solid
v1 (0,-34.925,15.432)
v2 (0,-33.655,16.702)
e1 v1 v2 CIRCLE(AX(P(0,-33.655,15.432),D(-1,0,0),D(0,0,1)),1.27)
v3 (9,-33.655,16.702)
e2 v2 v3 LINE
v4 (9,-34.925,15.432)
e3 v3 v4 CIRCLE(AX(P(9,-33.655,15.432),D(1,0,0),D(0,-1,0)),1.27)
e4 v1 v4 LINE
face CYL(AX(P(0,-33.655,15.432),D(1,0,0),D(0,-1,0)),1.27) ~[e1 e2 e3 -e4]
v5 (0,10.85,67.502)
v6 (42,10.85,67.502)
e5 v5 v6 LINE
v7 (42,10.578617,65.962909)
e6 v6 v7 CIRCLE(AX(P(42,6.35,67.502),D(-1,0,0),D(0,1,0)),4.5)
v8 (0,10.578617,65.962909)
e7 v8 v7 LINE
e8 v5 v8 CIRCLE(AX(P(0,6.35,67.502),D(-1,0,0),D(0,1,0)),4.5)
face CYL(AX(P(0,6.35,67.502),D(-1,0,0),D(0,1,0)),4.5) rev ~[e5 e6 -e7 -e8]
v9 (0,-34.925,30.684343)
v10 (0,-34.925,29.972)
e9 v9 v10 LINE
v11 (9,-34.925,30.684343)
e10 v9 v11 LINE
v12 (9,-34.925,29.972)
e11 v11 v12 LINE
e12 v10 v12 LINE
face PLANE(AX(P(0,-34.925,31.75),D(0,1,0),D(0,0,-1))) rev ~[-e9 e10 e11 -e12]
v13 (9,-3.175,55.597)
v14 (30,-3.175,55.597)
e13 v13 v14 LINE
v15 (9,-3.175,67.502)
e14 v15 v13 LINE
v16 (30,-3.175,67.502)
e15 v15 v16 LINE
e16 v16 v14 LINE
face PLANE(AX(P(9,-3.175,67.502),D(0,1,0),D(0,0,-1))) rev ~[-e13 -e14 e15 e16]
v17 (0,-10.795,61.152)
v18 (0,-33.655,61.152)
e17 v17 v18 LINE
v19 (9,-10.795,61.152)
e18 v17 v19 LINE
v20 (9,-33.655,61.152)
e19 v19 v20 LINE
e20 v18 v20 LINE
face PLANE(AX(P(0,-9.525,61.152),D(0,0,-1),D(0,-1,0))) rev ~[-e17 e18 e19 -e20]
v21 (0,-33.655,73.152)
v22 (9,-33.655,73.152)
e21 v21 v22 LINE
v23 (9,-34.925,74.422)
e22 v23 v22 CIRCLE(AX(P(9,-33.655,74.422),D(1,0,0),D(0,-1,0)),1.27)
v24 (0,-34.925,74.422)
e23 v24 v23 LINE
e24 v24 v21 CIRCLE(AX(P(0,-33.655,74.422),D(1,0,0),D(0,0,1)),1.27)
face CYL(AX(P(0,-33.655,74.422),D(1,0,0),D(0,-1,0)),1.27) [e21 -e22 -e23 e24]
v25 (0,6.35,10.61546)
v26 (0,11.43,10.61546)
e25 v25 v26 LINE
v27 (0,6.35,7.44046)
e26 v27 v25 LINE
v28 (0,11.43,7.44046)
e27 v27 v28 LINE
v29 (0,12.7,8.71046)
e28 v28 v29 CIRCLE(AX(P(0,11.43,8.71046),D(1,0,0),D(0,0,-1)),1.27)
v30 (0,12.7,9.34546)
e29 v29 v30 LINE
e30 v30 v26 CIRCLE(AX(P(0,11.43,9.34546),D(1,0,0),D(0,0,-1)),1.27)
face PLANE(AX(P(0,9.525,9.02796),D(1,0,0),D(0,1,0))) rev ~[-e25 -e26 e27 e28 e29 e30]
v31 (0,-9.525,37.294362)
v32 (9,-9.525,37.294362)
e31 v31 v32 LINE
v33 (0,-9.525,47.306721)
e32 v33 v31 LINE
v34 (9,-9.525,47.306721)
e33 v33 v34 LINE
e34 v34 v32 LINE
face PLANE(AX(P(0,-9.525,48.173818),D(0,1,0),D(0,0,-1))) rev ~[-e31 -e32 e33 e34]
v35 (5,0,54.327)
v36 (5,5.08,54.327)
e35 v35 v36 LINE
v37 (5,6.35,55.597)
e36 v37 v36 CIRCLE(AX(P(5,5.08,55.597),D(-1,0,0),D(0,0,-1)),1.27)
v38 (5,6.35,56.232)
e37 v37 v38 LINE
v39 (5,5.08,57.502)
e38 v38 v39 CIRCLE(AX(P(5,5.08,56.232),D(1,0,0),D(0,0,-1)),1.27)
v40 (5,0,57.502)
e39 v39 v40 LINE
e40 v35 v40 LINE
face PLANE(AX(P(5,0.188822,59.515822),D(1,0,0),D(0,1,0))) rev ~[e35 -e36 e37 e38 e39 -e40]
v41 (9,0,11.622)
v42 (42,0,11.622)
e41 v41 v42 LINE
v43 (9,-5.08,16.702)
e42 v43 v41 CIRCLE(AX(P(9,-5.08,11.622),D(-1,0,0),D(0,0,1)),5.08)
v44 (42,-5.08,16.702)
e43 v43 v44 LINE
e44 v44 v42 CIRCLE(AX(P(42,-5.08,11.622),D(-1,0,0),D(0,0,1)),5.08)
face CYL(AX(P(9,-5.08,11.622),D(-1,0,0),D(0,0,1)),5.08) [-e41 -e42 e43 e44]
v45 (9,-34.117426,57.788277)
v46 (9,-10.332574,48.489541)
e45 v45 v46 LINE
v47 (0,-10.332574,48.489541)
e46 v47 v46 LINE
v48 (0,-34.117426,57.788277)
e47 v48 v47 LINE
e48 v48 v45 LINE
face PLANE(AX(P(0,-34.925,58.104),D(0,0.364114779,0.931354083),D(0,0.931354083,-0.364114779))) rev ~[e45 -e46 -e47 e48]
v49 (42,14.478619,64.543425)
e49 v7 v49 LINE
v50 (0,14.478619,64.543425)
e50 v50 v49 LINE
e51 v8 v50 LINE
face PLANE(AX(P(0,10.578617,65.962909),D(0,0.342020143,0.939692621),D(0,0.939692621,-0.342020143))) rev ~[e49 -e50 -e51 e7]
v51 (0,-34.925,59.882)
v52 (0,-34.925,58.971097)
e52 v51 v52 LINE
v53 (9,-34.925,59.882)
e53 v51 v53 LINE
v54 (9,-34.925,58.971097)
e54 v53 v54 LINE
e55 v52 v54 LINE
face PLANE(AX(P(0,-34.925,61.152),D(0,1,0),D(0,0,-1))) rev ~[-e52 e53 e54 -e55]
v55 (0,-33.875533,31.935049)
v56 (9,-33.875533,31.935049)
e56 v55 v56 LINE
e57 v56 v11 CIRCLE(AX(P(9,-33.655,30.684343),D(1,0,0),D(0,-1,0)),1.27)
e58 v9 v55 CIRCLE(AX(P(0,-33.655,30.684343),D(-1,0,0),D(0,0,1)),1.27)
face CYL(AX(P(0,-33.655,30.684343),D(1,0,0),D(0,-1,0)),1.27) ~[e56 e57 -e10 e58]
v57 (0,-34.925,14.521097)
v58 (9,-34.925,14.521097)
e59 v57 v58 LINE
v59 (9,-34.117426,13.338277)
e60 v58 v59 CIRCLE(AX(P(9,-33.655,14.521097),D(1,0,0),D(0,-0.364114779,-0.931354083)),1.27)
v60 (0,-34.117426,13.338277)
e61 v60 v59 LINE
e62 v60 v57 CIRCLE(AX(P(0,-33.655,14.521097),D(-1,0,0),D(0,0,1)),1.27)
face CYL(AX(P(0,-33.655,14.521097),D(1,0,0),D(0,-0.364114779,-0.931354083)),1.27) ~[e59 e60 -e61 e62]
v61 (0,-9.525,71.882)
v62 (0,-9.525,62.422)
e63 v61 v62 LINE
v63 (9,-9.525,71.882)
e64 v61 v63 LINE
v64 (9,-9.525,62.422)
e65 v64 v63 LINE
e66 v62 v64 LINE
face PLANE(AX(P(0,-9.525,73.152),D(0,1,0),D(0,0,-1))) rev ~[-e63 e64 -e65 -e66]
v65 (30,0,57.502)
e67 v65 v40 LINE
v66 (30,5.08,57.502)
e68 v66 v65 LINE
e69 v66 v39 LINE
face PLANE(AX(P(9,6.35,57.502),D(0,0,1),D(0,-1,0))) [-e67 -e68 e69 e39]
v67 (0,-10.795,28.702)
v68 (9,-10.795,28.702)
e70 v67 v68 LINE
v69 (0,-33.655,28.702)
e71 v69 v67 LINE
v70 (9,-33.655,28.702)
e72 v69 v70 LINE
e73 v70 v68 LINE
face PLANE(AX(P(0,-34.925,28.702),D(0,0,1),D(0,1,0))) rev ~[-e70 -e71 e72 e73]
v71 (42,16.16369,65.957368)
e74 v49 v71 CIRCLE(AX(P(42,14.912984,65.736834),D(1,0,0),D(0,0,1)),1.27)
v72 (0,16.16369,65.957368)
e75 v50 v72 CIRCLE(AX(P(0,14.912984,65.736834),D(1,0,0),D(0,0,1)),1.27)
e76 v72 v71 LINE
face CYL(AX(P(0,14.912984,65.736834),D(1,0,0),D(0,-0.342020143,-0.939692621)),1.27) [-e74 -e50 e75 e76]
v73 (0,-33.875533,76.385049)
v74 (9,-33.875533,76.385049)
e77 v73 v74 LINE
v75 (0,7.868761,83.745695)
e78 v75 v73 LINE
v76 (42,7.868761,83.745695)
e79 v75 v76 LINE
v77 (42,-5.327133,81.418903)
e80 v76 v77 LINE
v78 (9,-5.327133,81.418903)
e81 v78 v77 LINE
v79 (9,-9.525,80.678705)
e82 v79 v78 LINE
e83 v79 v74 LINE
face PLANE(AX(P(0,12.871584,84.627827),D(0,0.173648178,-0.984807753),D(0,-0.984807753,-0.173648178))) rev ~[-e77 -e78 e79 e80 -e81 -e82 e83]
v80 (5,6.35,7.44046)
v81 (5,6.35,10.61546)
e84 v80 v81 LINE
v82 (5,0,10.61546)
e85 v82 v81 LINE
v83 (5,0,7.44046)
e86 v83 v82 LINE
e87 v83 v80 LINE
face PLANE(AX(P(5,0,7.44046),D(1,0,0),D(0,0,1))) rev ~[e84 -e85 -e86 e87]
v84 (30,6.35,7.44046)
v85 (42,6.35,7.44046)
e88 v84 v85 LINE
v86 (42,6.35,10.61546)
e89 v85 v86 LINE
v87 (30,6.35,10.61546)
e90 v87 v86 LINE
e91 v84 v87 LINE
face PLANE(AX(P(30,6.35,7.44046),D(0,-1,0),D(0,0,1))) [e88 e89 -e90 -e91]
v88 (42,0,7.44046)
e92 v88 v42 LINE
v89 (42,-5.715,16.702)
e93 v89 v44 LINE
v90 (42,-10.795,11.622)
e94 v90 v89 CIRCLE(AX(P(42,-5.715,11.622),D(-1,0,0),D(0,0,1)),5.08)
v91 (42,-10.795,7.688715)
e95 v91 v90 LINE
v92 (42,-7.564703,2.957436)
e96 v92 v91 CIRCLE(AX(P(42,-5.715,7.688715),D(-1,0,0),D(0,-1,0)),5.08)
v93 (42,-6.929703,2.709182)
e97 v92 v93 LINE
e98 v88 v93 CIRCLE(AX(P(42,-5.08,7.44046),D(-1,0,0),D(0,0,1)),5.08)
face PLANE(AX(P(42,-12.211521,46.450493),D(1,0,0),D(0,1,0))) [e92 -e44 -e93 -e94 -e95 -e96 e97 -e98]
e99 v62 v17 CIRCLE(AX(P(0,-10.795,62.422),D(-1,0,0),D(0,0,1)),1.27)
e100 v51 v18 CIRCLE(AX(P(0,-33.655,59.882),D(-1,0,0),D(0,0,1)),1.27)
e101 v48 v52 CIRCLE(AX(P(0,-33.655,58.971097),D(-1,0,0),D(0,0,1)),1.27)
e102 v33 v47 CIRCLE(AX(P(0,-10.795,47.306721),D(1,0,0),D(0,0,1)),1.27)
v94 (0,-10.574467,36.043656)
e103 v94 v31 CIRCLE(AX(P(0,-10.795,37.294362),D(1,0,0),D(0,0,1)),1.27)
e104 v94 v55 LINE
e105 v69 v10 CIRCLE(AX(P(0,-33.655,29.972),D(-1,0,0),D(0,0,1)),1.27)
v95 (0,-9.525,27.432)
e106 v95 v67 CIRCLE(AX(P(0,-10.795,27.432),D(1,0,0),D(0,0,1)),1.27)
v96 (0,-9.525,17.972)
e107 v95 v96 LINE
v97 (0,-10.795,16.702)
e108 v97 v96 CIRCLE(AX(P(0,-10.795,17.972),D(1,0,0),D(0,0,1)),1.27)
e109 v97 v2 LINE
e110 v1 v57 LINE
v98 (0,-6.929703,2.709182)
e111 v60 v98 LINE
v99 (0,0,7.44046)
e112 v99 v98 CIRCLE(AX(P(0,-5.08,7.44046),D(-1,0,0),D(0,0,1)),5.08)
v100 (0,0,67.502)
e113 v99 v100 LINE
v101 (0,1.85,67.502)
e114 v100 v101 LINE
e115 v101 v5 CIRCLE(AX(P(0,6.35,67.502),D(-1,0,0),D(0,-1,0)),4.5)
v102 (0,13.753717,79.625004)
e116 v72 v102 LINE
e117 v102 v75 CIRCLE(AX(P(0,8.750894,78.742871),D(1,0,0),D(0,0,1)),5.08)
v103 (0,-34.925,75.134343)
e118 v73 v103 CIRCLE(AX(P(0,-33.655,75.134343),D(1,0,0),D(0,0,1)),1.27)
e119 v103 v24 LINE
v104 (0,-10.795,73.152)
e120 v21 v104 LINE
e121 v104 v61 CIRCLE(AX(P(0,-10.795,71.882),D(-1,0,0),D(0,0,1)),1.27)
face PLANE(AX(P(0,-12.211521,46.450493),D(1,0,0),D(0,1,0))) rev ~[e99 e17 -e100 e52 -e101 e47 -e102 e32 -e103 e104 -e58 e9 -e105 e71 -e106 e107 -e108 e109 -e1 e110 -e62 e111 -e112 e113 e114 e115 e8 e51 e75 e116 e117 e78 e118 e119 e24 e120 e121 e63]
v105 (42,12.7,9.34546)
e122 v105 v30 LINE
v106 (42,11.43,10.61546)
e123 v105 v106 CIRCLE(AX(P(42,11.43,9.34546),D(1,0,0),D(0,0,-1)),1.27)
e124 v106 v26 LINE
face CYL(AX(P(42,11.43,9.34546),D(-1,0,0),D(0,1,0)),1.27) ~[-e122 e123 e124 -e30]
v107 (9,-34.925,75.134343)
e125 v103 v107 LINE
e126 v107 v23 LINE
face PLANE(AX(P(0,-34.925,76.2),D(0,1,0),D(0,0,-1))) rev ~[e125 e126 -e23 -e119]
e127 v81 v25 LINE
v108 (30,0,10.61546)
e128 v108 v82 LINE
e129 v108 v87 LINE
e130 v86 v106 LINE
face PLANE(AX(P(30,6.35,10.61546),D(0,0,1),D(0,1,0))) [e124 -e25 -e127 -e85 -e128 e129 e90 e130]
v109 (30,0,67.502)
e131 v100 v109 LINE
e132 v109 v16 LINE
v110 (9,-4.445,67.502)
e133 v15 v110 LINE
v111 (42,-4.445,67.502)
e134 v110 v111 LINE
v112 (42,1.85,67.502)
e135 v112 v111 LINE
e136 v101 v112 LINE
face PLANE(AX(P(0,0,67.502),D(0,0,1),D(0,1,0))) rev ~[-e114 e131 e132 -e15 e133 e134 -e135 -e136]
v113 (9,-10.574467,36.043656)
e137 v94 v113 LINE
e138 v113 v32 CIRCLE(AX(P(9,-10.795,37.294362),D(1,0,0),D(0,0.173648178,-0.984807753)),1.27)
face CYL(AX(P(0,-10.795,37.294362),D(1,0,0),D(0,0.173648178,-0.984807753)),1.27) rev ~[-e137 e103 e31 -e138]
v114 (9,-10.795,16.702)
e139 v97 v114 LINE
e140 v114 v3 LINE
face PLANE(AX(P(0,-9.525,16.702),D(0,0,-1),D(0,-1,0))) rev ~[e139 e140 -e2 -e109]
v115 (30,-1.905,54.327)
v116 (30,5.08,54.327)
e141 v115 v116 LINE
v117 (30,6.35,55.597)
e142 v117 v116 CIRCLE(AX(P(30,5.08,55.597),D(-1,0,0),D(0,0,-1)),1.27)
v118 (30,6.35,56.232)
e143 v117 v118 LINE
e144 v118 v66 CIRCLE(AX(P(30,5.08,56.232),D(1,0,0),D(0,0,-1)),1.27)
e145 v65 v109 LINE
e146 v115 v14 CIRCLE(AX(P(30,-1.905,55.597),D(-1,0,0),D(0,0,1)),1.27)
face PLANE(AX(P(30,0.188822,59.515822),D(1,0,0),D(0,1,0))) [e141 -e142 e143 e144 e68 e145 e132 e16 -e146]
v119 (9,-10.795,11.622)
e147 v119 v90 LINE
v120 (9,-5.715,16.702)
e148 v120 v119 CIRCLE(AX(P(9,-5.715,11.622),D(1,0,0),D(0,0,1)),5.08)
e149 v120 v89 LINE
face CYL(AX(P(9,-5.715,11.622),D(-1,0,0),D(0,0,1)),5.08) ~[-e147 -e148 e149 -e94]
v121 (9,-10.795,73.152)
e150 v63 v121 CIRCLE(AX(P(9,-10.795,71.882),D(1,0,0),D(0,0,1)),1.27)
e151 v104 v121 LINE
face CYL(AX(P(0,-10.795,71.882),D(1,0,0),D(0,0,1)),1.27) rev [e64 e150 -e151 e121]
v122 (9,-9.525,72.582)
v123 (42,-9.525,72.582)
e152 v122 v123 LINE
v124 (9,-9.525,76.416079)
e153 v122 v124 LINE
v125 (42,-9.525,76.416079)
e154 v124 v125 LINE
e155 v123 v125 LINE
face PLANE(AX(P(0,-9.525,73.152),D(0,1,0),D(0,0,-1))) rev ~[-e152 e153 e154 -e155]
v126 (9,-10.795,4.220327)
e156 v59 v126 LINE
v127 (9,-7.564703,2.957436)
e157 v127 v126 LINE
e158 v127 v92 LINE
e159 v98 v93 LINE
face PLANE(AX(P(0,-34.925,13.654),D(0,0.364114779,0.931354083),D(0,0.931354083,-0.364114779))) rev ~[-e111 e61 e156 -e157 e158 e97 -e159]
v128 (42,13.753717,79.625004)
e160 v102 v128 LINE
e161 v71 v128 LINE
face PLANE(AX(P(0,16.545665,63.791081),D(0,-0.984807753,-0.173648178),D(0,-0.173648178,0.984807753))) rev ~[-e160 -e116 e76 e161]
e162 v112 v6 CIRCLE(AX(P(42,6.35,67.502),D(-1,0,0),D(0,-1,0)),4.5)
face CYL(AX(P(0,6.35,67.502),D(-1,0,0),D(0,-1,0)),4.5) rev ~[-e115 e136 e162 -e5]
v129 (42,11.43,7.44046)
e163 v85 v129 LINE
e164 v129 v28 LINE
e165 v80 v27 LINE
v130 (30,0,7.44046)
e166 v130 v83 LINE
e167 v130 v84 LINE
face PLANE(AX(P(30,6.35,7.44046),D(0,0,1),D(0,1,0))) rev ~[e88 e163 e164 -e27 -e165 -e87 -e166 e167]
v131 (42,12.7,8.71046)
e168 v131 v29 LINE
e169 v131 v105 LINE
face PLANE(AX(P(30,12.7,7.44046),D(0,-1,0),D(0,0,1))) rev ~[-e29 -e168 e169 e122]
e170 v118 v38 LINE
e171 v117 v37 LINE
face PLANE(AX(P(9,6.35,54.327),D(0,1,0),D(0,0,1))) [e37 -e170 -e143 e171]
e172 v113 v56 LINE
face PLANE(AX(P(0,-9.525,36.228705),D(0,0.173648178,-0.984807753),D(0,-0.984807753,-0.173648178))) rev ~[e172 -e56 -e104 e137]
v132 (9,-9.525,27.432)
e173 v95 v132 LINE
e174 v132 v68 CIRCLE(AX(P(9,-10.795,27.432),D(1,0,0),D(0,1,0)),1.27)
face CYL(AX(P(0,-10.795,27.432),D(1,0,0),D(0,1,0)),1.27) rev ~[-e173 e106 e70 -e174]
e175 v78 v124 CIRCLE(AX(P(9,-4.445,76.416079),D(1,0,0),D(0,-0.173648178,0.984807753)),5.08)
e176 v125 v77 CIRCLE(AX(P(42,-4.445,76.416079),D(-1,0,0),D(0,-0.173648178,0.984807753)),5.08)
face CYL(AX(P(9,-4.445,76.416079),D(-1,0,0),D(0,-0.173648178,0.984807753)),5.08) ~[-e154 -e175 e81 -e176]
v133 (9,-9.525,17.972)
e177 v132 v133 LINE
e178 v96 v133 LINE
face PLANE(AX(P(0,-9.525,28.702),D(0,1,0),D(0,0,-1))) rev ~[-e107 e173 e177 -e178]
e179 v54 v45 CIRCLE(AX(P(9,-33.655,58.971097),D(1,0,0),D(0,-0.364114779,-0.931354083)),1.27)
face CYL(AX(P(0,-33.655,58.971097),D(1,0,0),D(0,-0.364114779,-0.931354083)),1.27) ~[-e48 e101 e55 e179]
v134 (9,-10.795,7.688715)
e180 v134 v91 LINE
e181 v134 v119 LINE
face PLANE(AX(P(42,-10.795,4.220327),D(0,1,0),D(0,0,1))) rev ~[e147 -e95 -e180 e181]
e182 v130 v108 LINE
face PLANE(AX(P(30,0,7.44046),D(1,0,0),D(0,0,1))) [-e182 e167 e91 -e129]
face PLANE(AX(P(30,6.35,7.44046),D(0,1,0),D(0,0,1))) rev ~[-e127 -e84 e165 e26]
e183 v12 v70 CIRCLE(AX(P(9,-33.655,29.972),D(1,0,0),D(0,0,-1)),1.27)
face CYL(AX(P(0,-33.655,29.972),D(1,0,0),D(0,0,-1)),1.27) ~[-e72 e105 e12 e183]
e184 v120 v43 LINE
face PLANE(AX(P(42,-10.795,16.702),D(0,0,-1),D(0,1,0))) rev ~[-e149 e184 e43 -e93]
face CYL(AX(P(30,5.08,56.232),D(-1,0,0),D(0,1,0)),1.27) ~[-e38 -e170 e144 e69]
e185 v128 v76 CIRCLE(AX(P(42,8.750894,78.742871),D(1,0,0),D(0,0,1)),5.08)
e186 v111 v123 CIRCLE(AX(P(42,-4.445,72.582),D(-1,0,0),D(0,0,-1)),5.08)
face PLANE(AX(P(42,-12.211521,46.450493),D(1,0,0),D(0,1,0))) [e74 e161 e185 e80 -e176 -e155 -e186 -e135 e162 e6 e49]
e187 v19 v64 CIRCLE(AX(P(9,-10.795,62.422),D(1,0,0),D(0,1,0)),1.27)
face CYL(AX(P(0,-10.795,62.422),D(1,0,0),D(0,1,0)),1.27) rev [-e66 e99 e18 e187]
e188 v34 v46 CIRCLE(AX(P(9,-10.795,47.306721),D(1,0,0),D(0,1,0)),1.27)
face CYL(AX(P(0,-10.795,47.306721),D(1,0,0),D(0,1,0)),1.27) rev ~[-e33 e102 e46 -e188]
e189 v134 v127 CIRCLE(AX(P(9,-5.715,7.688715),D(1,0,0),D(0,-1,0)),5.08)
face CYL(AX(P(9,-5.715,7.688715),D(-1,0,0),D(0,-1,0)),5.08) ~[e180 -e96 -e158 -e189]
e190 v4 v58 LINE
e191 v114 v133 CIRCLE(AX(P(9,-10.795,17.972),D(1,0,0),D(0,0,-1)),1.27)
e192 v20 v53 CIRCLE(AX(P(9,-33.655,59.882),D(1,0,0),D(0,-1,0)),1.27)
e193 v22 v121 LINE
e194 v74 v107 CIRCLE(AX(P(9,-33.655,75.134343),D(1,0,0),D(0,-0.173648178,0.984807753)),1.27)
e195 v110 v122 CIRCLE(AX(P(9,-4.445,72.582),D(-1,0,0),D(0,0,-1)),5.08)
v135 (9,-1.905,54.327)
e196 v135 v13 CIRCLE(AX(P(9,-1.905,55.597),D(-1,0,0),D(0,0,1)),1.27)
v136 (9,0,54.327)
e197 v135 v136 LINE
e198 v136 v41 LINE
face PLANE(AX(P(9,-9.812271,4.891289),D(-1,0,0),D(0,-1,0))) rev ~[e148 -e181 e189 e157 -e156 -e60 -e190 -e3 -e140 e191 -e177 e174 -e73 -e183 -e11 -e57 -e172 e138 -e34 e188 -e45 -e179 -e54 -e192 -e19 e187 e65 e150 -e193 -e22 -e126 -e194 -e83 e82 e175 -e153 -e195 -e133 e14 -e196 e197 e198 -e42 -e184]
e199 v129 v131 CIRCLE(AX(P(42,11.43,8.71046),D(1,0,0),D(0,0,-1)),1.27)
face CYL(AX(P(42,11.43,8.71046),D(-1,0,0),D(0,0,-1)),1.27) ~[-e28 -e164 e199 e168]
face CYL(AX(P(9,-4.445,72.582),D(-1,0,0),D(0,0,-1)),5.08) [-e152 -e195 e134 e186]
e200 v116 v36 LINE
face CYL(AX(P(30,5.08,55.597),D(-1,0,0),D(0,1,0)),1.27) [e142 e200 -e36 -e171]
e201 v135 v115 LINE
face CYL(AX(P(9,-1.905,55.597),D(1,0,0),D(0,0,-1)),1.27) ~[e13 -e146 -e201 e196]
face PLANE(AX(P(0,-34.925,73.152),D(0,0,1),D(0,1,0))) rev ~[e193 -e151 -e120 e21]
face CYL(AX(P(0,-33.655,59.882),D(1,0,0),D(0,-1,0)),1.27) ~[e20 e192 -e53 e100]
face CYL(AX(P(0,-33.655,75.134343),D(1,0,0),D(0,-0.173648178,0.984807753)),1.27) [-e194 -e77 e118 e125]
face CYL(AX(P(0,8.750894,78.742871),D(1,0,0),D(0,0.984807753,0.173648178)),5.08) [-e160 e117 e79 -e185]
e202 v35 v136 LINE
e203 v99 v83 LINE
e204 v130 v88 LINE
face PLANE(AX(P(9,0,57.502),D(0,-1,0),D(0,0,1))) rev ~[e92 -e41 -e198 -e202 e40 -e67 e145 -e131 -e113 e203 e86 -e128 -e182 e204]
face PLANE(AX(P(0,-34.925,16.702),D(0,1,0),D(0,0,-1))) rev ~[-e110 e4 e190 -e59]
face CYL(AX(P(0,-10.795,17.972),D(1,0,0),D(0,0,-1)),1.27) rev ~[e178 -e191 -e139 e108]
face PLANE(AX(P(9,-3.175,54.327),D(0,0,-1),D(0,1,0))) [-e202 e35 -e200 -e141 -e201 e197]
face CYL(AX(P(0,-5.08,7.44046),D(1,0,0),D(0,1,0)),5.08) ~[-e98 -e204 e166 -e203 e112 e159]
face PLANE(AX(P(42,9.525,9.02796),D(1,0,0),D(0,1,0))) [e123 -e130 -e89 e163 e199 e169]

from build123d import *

# Parameters (mm, degrees)
F1_DEPTH       = 42
F2_R           = 5.08
F3_R           = 1.27
F4_W           = 25
F4_H           = 3.175
F5_DEPTH       = 12.7
F7_DEPTH       = 33
F8_T1_DEPTH    = 45.7
F8_T3_DEPTH    = 43.656565316
F8_T5_DEPTH    = 41.6709689227
F9_W           = 6.35
F9_H           = 3.175
F10_DEPTH      = 12
F10_DEPTH_BACK = 30
F12_DEPTH      = 21
F12_DEPTH_BACK = 4
F13_R          = 1.27


# Not quite as in the source:
# - a fillet or chamfer that OpenCascade refuses, or shapes differently, is made with other operations: its cross-section is extruded or revolved along the edge and cut away or added


with BuildPart() as f1:
    # F0 (on Right) → F1 (new body)
    with BuildSketch(Plane.YZ):
        with BuildLine():
            Line((0, 0), (0, 67.502))
            Line((0, 67.502), (1.85, 67.502))
            ThreePointArc((1.85, 67.502), (6.35, 72.002), (10.85, 67.502))
            ThreePointArc((10.85, 67.502), (10.7816348886, 66.7205832005), (10.5786167935, 65.962909355))
            Line((10.5786167935, 65.962909355), (16.5456649355, 63.7910814449))
            Line((16.5456649355, 63.7910814449), (12.8715844298, 84.6278274207))
            Line((12.8715844298, 84.6278274207), (-34.925, 76.2))
            Line((-34.925, 76.2), (-34.925, 73.152))
            Line((-34.925, 73.152), (-9.525, 73.152))
            Line((-9.525, 73.152), (-9.525, 61.152))
            Line((-9.525, 61.152), (-34.925, 61.152))
            Line((-34.925, 61.152), (-34.925, 58.104))
            Line((-34.925, 58.104), (-9.525, 48.1738181818))
            Line((-9.525, 48.1738181818), (-9.525, 36.22870531))
            Line((-9.525, 36.22870531), (-34.925, 31.75))
            Line((-34.925, 31.75), (-34.925, 28.702))
            Line((-34.925, 28.702), (-9.525, 28.702))
            Line((-9.525, 28.702), (-9.525, 16.702))
            Line((-9.525, 16.702), (-34.925, 16.702))
            Line((-34.925, 16.702), (-34.925, 13.654))
            Line((-34.925, 13.654), (0, 0))
        make_face()
    extrude(amount=F1_DEPTH)

    # F2
    f2_edges = [f1.edges().sort_by_distance(p)[0] for p in [
        (21, 12.871584, 84.627827),
        (21, 0, 0),
    ]]
    fillet(f2_edges, radius=F2_R)

    # F3
    f3_edges = [f1.edges().sort_by_distance(p)[0] for p in [
        (21, 16.545665, 63.791081),
        (21, -9.525, 28.702),
        (21, -9.525, 48.173818),
        (21, -9.525, 73.152),
        (21, -9.525, 61.152),
        (21, -9.525, 16.702),
        (21, -34.925, 16.702),
        (21, -34.925, 13.654),
        (21, -34.925, 28.702),
        (21, -34.925, 61.152),
        (21, -34.925, 58.104),
        (21, -34.925, 31.75),
        (21, -34.925, 73.152),
        (21, -34.925, 76.2),
        (21, -9.525, 36.228705),
    ]]
    fillet(f3_edges, radius=F3_R)

    # F4 (on face) → F5 (join)
    with BuildSketch(Plane(origin=(0, 0, 0), x_dir=(-1, 0, 0), z_dir=(0, 1, 0))):
        with Locations((-17.5, 9.0279602963)):
            Rectangle(F4_W, F4_H)
    extrude(amount=F5_DEPTH)

    # F6 (on face) → F7 (cut)
    with BuildSketch(Plane.YZ.offset(42)):
        Polygon((0, 16.702), (0, 67.502), (-9.525, 67.502), (-9.525, 80.67870531), (-34.925, 80.67870531), (-34.925, 4.2203272727), (-10.795, 4.2203272727), (-10.795, 16.702), align=None)
    extrude(amount=-F7_DEPTH, mode=Mode.SUBTRACT)

    # F8: fillet of radius 5.08 on 5 edges, made by hand

    # F8_s2 → F8_t1 (cut)
    with BuildSketch(Plane.YZ.offset(9)):
        with BuildLine():
            ThreePointArc((-4.445, 67.502), (-8.0371024484, 68.9898975516), (-9.525, 72.582))
            Line((-9.525, 72.582), (-9.525, 67.502))
            Line((-9.525, 67.502), (-4.445, 67.502))
        make_face()
        with BuildLine():
            ThreePointArc((-5.715, 16.702), (-9.3071024484, 15.2141024484), (-10.795, 11.622))
            Line((-10.795, 11.622), (-10.795, 16.702))
            Line((-10.795, 16.702), (-5.715, 16.702))
        make_face()
        with BuildLine():
            ThreePointArc((-5.08, 16.702), (-1.4878975516, 15.2141024484), (0, 11.622))
            Line((0, 11.622), (0, 16.702))
            Line((0, 16.702), (-5.08, 16.702))
        make_face()
    extrude(amount=F8_T1_DEPTH, mode=Mode.SUBTRACT)

    # F8_s4 → F8_t3 (cut)
    with BuildSketch(Plane.YZ.offset(9)):
        with BuildLine():
            ThreePointArc((-5.3271327425, 81.4189025689), (-8.336505771, 79.6814402408), (-9.525, 76.4160791836))
            Line((-9.525, 76.4160791836), (-9.525, 80.67870531))
            Line((-9.525, 80.67870531), (-5.3271327425, 81.4189025689))
        make_face()
    extrude(amount=F8_T3_DEPTH, mode=Mode.SUBTRACT)

    # F8_s6 → F8_t5 (cut)
    with BuildSketch(Plane.YZ.offset(9)):
        with BuildLine():
            ThreePointArc((-10.795, 7.6887148418), (-9.9104077053, 4.8242857213), (-7.5647030762, 2.9574361003))
            Line((-7.5647030762, 2.9574361003), (-10.795, 4.2203272727))
            Line((-10.795, 4.2203272727), (-10.795, 7.6887148418))
        make_face()
    extrude(amount=F8_T5_DEPTH, mode=Mode.SUBTRACT)

    # F9 (on face) → F10 (join, two sides)
    with BuildSketch(Plane.YZ.offset(30)) as f10_sk:
        with Locations((9.525, 9.0279602963)):
            Rectangle(F9_W, F9_H)
    extrude(amount=F10_DEPTH)
    extrude(f10_sk.sketch, amount=-F10_DEPTH_BACK)

    # F11 (on face) → F12 (join, two sides)
    with BuildSketch(Plane.YZ.offset(9)) as f12_sk:
        Polygon((0, 57.502), (0, 67.502), (-3.175, 67.502), (-3.175, 54.327), (6.35, 54.327), (6.35, 57.502), align=None)
    extrude(amount=F12_DEPTH)
    extrude(f12_sk.sketch, amount=-F12_DEPTH_BACK)

    # F13
    f13_edges = [f1.edges().sort_by_distance(p)[0] for p in [
        (21, 12.7, 10.61546),
        (21, 12.7, 7.44046),
        (17.5, 6.35, 57.502),
        (17.5, 6.35, 54.327),
        (19.5, -3.175, 54.327),
    ]]
    fillet(f13_edges, radius=F13_R)


solid = f1.part
